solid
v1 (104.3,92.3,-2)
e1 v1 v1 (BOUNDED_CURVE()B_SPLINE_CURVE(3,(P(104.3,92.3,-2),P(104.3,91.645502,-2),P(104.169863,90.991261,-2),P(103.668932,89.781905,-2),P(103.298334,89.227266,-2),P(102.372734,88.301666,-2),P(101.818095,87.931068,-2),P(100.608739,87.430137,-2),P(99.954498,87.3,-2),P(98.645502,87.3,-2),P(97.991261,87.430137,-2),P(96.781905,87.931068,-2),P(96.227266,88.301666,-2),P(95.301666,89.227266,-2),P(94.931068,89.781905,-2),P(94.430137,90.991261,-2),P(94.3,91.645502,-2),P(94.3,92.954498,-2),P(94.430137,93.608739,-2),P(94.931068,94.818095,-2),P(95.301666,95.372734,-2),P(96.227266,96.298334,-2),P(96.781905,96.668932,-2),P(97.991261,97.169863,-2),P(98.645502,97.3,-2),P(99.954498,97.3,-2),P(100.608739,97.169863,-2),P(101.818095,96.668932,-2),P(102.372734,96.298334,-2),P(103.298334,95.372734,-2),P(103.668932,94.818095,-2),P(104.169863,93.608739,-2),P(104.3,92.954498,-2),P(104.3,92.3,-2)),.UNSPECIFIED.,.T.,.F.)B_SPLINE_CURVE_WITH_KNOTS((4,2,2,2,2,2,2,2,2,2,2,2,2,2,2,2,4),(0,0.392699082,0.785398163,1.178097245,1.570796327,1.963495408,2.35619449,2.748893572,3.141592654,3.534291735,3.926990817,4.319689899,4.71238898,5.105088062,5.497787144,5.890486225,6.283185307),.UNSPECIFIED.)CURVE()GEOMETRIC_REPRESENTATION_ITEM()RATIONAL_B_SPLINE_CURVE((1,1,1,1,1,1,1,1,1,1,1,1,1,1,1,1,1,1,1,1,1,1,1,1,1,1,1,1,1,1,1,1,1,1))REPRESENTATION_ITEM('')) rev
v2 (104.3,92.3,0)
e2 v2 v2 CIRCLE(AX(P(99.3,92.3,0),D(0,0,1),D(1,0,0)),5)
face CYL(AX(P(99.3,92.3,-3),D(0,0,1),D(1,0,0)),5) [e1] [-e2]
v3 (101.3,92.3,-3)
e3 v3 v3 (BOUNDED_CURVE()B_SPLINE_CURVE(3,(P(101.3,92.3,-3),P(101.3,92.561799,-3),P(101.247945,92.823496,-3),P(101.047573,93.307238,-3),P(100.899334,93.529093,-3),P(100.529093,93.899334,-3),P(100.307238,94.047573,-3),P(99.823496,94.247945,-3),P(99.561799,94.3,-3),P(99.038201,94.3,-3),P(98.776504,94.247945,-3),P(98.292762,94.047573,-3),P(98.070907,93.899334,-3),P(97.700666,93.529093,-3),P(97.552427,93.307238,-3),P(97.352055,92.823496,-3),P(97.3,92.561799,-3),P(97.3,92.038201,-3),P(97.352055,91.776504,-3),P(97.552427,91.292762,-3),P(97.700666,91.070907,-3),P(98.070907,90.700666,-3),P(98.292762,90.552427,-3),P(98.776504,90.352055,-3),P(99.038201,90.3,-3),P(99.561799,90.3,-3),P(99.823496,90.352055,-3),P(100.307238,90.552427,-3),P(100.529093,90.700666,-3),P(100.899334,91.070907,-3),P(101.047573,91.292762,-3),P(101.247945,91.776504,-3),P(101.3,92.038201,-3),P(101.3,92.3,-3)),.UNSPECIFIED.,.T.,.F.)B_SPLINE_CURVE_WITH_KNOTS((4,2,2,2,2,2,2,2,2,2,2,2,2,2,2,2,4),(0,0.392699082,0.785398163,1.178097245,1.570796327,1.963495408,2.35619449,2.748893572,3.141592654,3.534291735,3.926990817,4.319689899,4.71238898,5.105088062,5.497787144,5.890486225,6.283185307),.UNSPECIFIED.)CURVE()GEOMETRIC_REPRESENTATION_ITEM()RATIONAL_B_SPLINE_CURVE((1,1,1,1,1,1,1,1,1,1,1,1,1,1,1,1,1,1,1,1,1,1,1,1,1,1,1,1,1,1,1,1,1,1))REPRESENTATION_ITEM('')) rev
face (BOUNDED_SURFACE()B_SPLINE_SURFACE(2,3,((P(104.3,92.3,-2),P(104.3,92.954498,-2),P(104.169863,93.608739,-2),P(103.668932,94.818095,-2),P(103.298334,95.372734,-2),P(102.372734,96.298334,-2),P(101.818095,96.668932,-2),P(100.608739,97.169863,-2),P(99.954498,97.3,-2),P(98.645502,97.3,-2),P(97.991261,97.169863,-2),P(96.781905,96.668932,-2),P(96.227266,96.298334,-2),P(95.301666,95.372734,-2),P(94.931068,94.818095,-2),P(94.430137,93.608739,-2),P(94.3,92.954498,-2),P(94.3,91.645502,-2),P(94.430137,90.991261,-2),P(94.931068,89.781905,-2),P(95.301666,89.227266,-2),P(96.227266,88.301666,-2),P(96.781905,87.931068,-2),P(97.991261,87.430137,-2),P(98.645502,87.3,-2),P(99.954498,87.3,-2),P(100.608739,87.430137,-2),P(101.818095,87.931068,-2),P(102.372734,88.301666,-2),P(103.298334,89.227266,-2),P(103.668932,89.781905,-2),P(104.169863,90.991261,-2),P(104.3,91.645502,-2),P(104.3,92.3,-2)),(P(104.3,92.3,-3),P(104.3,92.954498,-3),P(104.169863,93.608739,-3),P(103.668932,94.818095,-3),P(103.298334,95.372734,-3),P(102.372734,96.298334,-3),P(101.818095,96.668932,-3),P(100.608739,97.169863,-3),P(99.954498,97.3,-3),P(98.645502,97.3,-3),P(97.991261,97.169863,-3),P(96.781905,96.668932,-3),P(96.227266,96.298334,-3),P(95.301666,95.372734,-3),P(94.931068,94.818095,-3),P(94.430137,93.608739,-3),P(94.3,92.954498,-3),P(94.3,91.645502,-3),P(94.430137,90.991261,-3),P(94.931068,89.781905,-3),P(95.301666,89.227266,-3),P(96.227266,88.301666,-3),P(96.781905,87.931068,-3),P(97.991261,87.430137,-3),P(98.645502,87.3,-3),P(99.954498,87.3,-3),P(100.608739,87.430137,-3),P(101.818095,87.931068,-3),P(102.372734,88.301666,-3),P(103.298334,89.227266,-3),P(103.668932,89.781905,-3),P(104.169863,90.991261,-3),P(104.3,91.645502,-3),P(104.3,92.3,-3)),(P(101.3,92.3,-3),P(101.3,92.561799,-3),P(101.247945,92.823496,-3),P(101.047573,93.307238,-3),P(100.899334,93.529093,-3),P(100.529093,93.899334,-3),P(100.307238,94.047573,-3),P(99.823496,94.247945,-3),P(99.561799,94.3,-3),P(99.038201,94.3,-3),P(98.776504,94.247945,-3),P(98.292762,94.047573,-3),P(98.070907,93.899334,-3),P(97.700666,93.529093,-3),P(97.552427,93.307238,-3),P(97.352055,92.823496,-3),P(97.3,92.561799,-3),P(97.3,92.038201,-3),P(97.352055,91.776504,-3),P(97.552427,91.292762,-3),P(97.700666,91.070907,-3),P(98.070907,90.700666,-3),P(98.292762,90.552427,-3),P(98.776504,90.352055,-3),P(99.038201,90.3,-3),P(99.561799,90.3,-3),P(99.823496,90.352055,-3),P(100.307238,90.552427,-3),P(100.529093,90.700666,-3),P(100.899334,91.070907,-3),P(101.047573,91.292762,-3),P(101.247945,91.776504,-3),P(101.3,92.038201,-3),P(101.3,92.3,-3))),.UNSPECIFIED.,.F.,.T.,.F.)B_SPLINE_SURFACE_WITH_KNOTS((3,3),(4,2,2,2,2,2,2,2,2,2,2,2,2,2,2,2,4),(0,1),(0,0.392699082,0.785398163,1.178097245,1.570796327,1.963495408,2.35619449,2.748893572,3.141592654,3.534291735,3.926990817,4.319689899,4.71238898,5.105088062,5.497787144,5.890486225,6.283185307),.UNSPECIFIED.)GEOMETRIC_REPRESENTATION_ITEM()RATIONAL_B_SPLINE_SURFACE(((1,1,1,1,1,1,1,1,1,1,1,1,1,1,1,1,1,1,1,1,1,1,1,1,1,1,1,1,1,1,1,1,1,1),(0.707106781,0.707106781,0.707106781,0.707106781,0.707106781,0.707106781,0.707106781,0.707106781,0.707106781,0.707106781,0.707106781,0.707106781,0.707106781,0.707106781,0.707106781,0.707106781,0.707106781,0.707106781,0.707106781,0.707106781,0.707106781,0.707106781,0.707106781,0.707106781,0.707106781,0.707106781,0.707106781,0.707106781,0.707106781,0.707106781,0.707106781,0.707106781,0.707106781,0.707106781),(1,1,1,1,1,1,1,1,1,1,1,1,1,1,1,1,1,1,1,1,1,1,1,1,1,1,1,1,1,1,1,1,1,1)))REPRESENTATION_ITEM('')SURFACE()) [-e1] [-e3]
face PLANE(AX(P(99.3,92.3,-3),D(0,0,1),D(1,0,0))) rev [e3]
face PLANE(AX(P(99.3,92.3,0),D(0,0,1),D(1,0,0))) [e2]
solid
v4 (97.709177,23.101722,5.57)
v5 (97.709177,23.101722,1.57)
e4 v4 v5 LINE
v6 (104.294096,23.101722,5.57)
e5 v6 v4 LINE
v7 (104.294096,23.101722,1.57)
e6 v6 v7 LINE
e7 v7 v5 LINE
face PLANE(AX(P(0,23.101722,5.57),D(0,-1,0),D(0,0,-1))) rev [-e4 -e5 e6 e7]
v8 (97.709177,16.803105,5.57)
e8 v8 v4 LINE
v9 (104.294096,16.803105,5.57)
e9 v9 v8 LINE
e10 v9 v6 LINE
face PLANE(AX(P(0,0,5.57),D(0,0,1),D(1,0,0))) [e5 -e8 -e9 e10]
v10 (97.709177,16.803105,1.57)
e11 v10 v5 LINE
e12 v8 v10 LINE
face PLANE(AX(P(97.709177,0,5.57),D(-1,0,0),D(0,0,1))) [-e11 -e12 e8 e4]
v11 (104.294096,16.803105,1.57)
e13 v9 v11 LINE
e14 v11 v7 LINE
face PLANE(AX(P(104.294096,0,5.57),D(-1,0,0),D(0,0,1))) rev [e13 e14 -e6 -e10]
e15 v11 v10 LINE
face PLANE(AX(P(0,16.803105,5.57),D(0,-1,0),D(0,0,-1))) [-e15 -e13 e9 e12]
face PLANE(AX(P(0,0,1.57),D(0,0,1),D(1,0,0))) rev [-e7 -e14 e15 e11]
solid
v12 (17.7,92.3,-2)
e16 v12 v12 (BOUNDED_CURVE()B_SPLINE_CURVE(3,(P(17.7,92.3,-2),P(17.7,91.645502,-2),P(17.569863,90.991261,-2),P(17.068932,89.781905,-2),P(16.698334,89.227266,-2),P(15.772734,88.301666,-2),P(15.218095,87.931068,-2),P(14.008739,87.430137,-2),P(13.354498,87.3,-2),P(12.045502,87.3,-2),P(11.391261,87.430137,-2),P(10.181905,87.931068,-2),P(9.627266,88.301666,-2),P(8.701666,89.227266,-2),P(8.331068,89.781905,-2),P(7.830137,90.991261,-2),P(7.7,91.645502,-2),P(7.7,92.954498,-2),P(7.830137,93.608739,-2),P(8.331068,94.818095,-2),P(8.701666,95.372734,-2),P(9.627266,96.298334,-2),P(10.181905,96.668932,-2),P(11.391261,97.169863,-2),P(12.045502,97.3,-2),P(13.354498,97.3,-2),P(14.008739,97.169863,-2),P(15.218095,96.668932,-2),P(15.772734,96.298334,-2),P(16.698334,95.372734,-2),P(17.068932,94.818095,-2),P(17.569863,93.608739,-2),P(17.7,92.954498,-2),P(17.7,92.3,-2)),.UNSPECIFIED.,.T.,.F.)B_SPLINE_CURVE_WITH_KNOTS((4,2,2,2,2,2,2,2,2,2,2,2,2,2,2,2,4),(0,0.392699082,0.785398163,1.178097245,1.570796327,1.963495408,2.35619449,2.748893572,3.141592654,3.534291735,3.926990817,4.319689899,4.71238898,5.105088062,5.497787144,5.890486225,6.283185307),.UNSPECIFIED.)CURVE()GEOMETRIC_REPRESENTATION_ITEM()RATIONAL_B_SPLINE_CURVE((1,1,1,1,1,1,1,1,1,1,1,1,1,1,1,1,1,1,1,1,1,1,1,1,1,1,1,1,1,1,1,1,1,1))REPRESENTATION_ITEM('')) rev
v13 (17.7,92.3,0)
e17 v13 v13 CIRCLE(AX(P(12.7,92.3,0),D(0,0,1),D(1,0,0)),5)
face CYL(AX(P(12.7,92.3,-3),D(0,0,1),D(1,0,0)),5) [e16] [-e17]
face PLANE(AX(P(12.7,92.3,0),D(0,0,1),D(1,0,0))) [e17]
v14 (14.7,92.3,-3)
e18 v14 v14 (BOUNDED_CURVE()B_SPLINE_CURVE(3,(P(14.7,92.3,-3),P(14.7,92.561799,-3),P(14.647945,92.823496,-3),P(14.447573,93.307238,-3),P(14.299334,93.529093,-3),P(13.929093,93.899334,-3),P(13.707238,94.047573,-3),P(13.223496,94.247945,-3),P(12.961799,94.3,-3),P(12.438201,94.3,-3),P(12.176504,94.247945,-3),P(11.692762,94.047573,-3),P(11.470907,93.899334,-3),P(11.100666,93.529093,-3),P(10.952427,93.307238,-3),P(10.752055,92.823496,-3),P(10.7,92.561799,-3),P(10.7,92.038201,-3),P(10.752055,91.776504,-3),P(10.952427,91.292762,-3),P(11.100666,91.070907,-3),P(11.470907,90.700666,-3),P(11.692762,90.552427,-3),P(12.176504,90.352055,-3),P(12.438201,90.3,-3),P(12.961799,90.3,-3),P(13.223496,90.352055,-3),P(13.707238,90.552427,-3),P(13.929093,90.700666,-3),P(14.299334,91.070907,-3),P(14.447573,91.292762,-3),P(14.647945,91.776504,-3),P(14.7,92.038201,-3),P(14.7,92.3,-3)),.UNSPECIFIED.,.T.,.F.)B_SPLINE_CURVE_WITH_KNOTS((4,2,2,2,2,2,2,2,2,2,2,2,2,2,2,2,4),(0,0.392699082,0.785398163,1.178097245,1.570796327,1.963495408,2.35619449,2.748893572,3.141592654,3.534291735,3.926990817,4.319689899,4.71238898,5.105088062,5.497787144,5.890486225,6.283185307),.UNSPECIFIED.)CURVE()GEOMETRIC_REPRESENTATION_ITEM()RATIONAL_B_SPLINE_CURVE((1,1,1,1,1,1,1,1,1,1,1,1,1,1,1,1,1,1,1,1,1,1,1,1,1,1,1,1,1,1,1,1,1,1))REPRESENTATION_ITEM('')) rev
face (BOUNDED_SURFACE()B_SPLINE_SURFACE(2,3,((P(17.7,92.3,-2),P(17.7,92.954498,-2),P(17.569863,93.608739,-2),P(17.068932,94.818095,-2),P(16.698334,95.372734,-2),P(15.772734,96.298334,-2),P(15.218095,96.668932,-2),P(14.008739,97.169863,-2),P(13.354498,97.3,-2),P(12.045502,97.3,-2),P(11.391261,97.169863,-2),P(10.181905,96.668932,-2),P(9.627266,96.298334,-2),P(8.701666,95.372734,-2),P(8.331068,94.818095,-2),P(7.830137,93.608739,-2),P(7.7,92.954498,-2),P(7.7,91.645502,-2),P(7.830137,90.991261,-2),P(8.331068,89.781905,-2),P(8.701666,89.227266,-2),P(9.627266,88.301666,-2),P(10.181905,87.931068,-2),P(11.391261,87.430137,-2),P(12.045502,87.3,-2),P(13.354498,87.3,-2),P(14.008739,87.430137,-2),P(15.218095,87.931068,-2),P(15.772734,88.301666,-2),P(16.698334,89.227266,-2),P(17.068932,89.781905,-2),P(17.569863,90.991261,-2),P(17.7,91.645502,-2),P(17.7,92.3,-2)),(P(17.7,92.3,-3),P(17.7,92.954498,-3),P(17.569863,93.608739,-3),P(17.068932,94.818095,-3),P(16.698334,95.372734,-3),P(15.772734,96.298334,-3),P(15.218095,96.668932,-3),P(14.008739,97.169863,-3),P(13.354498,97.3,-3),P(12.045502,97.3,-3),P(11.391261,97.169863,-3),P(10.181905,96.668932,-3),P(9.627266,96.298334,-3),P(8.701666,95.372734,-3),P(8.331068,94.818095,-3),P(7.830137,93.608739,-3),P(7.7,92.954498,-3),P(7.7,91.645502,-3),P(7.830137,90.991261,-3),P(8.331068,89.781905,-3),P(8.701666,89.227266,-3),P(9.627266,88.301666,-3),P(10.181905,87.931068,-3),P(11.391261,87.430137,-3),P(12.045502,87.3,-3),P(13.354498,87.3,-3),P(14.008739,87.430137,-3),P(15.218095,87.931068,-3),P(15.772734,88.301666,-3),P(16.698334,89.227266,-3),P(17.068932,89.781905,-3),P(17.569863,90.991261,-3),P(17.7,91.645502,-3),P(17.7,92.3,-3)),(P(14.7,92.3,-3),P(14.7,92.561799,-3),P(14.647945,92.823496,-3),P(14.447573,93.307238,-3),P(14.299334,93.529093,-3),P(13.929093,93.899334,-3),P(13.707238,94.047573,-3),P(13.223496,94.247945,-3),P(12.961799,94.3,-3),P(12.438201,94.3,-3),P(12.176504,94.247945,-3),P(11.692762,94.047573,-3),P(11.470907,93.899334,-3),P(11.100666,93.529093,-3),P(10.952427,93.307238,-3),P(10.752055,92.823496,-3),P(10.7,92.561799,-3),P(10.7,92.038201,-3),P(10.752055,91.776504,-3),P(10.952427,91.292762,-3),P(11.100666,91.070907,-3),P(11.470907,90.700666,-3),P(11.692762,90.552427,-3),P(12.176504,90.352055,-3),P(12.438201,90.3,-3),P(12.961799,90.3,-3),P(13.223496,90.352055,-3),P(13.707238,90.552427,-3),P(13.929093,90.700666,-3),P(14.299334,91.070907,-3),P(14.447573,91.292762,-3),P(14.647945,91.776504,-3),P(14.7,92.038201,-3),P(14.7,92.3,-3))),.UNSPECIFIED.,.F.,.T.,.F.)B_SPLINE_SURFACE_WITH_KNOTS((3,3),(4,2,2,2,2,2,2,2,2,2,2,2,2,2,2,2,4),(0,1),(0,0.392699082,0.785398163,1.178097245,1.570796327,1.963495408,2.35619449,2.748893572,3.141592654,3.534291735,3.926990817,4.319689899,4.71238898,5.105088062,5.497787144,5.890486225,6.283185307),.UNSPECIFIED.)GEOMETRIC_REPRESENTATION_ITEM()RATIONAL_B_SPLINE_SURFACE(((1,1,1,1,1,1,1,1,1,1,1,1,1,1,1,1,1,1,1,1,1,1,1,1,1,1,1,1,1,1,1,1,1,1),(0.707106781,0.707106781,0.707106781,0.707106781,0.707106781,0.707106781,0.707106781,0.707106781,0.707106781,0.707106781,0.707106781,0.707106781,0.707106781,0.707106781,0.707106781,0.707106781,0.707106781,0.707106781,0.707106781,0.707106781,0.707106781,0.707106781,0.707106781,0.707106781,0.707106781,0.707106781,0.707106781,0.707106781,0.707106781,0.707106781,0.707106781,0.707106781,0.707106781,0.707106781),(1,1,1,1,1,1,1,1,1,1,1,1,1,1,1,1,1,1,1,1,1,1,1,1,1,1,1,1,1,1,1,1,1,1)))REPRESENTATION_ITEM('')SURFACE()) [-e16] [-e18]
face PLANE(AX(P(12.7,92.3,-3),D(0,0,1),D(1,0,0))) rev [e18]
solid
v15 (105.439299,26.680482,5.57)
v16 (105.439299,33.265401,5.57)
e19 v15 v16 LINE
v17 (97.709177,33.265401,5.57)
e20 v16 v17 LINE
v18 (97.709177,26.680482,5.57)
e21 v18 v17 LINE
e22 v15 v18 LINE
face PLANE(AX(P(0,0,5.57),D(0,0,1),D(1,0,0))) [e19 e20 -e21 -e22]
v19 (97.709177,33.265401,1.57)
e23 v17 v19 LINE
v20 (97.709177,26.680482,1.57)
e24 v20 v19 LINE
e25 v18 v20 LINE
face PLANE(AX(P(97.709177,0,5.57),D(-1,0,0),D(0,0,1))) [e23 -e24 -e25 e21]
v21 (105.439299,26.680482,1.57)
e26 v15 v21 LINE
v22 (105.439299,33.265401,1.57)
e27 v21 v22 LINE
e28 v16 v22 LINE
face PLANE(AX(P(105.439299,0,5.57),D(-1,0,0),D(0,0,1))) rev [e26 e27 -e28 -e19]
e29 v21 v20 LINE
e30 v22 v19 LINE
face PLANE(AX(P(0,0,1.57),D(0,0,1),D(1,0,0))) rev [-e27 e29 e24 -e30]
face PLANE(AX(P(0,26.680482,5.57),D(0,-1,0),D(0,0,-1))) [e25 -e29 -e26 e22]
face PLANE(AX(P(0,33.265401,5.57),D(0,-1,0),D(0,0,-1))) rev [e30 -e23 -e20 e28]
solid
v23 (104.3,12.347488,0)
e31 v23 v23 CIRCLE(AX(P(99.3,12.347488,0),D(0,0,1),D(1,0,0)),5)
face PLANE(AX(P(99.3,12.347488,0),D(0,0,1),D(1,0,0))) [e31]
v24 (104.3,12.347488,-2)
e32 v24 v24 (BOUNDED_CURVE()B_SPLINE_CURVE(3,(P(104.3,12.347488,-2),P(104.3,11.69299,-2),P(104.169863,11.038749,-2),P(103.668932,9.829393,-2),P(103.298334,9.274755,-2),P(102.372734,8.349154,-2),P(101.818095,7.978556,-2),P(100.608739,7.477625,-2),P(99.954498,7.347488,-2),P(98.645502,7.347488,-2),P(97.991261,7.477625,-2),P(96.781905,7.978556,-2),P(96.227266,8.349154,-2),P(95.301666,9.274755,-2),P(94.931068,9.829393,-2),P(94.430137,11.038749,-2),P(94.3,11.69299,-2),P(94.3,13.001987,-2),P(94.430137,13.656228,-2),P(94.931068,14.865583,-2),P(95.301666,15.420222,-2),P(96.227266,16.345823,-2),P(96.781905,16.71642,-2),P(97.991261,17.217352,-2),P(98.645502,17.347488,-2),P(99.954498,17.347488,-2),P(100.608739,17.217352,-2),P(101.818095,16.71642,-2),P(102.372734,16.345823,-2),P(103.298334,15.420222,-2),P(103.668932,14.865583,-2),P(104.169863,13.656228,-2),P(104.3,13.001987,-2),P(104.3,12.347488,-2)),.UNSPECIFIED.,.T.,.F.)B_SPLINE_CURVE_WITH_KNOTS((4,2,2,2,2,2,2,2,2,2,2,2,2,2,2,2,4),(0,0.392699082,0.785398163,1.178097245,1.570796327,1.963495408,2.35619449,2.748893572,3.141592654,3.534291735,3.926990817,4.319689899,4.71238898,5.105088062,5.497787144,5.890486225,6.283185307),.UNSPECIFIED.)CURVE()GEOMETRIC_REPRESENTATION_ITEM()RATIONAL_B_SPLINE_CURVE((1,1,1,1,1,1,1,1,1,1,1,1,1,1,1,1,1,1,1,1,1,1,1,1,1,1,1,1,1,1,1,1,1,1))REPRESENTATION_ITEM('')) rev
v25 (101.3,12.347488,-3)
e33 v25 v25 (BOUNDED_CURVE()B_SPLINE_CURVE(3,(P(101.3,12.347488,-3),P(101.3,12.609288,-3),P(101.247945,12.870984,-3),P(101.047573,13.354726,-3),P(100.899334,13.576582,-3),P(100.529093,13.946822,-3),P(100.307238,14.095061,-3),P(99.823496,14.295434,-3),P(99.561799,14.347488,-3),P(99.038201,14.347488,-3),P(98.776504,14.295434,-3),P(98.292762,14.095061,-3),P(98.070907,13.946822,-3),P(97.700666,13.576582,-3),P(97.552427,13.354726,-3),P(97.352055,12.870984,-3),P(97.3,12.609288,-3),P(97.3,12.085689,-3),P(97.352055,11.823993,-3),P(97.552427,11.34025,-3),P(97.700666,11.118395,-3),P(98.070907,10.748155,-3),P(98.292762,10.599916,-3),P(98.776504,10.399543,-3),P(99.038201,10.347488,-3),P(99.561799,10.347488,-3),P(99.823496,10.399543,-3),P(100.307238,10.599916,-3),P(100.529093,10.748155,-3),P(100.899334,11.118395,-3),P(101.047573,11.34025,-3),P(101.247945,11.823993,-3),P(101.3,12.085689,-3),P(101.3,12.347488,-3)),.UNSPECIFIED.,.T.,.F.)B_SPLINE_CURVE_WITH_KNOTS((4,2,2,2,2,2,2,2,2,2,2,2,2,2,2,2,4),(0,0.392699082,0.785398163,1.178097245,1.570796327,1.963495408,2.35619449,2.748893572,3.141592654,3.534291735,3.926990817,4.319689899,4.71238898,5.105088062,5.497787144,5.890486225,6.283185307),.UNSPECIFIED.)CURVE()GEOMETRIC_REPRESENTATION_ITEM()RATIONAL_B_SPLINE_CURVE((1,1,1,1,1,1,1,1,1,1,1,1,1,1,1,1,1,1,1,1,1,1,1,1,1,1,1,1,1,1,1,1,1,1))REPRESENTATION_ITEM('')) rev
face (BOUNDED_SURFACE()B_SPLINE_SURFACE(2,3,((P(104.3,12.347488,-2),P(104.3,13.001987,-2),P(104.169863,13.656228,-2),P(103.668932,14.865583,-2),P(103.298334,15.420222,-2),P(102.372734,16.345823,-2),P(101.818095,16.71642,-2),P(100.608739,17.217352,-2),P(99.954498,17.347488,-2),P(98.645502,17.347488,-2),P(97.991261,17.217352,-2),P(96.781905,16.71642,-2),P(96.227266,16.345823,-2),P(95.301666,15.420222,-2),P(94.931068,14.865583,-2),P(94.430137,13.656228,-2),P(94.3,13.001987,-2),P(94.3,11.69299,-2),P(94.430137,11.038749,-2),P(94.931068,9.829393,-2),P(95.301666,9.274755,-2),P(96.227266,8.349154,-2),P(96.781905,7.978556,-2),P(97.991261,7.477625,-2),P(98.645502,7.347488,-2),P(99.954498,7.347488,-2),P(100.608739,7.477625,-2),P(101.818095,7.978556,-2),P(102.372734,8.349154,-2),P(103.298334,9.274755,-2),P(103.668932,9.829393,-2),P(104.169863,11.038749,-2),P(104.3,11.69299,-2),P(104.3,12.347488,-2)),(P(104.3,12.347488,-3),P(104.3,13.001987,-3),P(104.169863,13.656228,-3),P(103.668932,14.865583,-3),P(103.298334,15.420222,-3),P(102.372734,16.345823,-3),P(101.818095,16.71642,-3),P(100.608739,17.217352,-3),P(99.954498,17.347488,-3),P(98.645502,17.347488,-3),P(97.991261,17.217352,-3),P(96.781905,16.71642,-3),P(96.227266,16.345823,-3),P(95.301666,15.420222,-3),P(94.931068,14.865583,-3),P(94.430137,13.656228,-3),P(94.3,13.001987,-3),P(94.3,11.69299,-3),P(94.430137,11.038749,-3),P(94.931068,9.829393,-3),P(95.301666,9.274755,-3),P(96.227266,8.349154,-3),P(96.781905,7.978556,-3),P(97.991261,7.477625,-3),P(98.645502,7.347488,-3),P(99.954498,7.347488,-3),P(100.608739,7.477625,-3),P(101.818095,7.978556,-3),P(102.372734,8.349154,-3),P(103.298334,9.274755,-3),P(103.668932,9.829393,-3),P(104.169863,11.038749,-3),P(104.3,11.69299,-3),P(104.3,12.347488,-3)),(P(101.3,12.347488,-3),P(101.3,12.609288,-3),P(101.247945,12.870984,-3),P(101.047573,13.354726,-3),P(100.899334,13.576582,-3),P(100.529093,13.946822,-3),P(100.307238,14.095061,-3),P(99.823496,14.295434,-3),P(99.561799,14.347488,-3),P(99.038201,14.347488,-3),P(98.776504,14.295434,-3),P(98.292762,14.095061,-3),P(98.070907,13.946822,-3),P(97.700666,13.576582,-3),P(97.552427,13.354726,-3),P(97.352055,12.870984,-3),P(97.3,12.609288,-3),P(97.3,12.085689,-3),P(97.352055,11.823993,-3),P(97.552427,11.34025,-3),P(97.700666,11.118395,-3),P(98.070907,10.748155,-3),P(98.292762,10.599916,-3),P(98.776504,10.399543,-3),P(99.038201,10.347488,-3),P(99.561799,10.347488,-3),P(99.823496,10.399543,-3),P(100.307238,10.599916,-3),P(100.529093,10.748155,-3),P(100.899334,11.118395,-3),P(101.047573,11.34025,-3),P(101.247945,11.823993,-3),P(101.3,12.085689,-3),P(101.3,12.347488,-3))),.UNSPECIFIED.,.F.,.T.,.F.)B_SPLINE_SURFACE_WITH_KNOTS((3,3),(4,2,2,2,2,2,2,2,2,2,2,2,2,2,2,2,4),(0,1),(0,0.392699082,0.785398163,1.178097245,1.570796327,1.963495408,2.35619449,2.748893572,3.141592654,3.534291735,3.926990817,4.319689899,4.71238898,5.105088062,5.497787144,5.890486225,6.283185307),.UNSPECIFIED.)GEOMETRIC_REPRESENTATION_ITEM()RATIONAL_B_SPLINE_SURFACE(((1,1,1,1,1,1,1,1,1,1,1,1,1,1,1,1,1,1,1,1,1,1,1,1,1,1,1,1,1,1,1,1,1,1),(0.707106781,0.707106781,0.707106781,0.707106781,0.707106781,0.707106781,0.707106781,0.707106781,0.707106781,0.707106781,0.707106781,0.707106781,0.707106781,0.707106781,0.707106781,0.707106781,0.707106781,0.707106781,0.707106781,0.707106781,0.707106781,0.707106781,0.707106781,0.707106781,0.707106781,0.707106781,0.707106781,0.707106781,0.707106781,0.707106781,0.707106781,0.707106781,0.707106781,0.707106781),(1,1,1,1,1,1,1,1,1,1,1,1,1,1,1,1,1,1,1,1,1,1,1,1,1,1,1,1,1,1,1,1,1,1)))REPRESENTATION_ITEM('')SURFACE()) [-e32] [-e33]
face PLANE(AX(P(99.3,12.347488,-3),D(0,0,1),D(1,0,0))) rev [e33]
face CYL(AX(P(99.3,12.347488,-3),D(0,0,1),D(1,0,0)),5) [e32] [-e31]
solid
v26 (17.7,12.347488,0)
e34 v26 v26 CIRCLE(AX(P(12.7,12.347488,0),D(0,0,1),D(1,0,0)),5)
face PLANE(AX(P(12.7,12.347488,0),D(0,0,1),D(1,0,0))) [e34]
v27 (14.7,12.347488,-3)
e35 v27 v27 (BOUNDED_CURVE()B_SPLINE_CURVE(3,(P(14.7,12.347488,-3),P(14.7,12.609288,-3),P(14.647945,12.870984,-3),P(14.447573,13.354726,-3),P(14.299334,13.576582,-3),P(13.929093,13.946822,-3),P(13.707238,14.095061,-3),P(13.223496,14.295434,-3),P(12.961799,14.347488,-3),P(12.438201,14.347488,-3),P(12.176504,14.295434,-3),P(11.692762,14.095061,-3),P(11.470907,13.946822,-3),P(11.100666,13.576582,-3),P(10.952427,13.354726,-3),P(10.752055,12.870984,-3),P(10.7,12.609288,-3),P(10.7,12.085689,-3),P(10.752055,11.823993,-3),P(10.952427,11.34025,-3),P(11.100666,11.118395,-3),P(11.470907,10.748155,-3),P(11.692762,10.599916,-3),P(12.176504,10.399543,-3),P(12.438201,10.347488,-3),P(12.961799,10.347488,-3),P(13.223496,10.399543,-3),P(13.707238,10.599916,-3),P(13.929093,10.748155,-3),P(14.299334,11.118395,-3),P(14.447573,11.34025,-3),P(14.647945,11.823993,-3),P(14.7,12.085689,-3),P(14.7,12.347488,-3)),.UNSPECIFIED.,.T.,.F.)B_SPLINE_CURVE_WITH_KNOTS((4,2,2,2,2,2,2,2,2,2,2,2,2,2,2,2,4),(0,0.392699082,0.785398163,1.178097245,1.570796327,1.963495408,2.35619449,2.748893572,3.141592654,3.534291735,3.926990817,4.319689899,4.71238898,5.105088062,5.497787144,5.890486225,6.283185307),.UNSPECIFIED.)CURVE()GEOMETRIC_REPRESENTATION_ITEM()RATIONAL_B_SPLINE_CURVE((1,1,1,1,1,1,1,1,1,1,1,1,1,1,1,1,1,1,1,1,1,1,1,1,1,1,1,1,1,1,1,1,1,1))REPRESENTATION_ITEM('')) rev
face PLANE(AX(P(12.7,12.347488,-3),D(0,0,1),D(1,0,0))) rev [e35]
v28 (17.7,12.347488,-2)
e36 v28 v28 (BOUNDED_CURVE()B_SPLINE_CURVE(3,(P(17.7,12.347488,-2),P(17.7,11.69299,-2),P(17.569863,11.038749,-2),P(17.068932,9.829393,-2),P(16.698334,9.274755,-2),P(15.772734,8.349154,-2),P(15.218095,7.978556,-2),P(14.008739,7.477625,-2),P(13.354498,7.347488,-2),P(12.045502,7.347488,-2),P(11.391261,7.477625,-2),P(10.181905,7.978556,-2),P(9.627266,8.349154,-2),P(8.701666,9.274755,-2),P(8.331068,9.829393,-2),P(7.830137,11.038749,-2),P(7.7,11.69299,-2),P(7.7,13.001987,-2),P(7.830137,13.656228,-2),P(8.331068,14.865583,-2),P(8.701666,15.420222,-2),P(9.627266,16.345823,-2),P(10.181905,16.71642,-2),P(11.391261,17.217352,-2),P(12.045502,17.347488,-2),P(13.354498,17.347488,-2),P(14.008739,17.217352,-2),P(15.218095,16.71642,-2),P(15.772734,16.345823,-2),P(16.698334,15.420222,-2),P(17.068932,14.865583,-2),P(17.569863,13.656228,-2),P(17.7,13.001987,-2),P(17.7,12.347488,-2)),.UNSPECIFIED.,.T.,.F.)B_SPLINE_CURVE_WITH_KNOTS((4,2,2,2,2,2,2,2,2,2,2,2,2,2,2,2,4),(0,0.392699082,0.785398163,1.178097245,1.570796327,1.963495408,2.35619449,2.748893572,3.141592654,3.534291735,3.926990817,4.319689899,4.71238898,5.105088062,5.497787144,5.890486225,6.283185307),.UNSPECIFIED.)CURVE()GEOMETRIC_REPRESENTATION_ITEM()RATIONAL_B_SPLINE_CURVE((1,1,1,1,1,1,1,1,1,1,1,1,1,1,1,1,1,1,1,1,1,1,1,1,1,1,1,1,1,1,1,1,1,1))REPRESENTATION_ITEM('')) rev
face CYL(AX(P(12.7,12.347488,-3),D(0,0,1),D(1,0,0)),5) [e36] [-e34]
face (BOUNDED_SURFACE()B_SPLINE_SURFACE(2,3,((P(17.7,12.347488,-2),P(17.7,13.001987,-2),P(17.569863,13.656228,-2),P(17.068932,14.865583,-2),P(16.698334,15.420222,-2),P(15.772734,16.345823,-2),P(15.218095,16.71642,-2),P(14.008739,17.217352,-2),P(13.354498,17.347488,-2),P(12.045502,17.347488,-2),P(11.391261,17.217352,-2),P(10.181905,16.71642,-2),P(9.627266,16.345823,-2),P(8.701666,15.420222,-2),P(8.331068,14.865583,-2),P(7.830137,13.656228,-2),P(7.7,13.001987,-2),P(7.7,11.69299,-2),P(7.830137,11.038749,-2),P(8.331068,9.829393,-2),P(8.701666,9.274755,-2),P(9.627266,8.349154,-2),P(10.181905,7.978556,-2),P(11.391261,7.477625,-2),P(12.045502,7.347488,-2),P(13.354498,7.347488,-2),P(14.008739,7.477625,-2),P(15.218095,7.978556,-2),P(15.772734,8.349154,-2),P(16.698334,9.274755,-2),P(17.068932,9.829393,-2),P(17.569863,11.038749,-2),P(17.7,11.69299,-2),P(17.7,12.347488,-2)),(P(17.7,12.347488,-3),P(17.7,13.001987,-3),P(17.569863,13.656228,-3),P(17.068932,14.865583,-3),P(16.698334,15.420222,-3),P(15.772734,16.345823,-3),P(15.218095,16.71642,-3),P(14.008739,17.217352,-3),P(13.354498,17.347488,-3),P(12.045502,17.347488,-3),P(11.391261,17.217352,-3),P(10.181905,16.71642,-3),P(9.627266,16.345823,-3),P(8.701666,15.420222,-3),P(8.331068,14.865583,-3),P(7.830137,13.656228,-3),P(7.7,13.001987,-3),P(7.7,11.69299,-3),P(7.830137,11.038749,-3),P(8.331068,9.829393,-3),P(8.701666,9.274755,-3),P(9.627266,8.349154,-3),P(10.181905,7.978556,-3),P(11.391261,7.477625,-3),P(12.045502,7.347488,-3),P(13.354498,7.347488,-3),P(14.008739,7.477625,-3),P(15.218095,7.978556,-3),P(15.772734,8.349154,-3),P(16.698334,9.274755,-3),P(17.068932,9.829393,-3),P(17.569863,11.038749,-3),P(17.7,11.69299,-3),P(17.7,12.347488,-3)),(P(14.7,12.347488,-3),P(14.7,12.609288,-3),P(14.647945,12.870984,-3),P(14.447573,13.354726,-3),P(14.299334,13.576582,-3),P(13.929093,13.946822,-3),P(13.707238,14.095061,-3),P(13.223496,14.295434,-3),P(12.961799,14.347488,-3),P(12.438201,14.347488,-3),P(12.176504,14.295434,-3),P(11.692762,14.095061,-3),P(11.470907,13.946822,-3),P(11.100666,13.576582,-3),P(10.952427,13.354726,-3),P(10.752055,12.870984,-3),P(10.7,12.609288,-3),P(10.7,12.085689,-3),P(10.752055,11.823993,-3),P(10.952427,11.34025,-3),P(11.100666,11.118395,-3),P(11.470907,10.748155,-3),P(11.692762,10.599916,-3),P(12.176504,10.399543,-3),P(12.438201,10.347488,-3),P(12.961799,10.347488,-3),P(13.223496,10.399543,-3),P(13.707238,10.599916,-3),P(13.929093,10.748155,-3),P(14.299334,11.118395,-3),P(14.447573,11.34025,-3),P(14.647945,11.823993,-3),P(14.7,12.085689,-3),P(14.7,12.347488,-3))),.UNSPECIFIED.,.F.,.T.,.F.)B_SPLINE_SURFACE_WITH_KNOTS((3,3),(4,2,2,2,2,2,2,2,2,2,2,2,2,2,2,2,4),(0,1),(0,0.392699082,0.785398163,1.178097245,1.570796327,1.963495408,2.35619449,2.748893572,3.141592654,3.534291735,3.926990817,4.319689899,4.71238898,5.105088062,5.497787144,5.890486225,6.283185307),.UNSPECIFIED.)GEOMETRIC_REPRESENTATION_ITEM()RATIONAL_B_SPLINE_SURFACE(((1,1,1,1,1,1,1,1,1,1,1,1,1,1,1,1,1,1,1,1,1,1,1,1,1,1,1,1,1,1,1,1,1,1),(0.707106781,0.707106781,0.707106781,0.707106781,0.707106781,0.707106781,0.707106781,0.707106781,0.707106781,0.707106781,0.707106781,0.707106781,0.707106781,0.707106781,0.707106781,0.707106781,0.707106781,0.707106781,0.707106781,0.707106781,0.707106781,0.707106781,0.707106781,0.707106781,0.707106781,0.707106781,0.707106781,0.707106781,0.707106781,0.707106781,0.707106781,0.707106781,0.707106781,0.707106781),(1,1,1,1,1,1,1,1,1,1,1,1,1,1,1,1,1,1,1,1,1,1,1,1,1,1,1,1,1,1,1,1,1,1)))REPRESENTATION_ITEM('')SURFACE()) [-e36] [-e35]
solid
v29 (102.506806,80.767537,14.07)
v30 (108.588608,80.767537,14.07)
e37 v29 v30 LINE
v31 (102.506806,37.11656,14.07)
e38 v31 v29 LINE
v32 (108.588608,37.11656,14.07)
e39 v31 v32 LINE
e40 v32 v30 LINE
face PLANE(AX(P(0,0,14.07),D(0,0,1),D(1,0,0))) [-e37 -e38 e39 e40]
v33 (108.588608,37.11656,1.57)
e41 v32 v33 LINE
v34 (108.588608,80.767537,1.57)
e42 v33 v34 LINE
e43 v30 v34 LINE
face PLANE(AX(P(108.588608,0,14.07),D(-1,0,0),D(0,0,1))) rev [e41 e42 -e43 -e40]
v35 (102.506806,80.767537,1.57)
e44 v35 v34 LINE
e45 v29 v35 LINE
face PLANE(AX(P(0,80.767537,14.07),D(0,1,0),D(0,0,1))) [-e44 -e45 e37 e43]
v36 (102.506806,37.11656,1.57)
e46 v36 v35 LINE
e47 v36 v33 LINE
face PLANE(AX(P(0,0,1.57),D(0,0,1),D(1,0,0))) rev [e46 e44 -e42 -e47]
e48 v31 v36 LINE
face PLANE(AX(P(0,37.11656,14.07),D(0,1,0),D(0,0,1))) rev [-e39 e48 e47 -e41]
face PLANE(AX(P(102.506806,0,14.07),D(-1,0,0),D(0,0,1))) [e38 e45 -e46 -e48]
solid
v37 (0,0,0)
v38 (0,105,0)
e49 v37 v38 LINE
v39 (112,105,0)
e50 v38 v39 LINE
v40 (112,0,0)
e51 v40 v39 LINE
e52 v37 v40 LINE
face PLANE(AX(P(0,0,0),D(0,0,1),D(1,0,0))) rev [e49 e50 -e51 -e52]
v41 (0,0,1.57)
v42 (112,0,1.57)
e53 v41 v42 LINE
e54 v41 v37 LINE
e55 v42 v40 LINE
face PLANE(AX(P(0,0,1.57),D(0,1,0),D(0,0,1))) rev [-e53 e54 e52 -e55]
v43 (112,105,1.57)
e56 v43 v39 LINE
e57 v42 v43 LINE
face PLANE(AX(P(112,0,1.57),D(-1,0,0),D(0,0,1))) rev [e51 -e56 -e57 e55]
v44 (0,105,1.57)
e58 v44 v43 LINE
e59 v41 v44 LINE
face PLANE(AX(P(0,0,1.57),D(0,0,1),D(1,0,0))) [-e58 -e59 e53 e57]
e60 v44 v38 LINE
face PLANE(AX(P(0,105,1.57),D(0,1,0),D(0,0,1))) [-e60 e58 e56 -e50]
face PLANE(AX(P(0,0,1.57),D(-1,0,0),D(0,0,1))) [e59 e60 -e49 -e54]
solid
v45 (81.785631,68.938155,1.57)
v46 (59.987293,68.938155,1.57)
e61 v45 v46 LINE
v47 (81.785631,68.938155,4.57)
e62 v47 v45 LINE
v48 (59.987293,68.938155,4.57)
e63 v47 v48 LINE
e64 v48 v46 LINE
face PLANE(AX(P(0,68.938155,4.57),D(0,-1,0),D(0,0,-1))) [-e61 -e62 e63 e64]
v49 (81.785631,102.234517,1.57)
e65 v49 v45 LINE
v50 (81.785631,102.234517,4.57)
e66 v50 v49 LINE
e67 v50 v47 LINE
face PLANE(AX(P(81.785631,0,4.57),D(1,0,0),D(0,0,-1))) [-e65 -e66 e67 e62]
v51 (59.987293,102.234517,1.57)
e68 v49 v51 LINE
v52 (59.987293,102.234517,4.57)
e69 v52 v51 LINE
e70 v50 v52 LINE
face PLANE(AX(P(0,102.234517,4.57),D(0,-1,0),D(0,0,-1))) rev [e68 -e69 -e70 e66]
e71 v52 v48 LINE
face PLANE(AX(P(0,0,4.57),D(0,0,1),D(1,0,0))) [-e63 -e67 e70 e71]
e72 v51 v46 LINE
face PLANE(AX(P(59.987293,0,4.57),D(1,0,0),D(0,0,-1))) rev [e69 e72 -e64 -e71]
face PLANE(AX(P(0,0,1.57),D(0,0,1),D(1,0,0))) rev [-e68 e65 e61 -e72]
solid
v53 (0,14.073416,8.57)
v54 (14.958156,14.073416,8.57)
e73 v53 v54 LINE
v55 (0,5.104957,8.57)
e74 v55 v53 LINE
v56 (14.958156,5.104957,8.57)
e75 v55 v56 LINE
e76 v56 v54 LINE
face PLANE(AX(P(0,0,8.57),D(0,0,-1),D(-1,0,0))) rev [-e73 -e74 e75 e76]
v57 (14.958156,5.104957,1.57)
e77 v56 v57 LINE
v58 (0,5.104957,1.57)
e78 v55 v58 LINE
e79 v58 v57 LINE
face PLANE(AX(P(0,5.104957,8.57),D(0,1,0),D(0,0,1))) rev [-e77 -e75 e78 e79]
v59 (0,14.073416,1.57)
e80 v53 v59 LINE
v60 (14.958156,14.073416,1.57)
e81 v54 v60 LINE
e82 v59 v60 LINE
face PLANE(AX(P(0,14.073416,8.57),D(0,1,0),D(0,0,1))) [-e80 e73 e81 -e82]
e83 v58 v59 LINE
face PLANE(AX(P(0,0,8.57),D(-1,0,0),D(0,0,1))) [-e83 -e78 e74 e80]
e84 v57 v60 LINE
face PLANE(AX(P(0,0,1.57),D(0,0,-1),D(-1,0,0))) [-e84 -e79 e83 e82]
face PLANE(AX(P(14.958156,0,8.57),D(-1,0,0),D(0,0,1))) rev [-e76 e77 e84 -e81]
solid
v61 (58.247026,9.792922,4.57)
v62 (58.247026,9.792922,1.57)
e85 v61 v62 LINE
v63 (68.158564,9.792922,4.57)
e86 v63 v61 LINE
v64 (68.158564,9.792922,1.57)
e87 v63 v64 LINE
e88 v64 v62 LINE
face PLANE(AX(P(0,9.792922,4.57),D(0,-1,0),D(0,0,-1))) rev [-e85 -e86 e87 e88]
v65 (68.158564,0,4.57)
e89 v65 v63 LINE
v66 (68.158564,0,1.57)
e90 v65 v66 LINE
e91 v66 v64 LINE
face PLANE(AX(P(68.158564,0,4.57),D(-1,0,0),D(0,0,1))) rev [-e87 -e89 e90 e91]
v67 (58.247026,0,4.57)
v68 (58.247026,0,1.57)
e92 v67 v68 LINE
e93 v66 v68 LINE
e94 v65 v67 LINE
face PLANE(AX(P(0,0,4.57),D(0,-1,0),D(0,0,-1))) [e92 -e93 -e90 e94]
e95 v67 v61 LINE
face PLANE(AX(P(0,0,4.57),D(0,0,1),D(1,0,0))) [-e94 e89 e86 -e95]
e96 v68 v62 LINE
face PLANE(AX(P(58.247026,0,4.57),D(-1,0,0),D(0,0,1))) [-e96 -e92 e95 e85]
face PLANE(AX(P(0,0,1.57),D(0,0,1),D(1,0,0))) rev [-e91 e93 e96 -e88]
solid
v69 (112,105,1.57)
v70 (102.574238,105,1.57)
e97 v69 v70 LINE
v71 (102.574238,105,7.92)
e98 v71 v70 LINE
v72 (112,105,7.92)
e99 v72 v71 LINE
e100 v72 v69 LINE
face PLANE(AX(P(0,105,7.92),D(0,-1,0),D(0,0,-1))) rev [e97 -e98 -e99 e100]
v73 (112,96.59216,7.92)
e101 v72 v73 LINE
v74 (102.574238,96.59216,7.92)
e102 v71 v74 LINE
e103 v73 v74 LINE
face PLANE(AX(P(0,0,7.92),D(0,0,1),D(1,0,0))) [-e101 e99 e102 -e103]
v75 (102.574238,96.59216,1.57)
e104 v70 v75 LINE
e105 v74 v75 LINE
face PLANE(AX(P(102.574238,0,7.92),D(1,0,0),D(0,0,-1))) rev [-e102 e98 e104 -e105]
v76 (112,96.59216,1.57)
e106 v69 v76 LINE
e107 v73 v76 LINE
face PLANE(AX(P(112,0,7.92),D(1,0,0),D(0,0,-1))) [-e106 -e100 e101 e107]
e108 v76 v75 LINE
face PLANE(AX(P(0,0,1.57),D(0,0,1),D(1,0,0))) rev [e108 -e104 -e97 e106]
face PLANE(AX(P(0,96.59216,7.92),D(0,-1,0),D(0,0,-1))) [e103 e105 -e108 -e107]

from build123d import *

# Parameters (mm, degrees)
SKETCH1_W             = 112
SKETCH1_H             = 105
BASE_PCB_DEPTH        = 1.57
SMA_START             = 1.57
SKETCH1_3_W           = 9.425761926
SKETCH1_3_H           = 8.407839617
SMA_CONNECTOR_DEPTH   = 6.35
MINI_START            = 1.57
SKETCH1_4_W           = 9.91153772
SKETCH1_4_H           = 9.792921807
MINI_USB_DEPTH        = 3
BARREL_START          = 1.57
SKETCH1_5_W           = 14.958155809
SKETCH1_5_H           = 8.968458872
BARREL_JACK_DEPTH     = 7
GPIO_START            = 1.57
SKETCH1_6_W           = 6.081801239
SKETCH1_6_H           = 43.650976509
GPIO_DEPTH            = 12.5
BUTTONS_START         = 1.57
SKETCH1_7_W           = 7.730121667
SKETCH1_7_H           = 6.584918457
BUTTONS_DEPTH         = 4
SKETCH1_7_W_2         = 6.584918457
SKETCH1_7_H_2         = 6.298617654
BUTTONS_2_DEPTH       = 4
XBEE_START            = 1.57
SKETCH1_8_W           = 21.798337537
SKETCH1_8_H           = 33.296361733
XBEE_DEPTH            = 3
SKETCH2_R             = 5
BOSS_EXTRUDE8_DEPTH   = 3
BOSS_EXTRUDE8_2_DEPTH = 3
BOSS_EXTRUDE8_3_DEPTH = 3
BOSS_EXTRUDE8_4_DEPTH = 3
FILLET1_SIZE          = 1
FILLET1_SIZE_2        = 3
FILLET2_SIZE          = 1
FILLET2_SIZE_2        = 3
FILLET3_SIZE          = 1
FILLET3_SIZE_2        = 3
FILLET4_SIZE          = 1
FILLET4_SIZE_2        = 3


with BuildPart() as part:
    # Sketch1 → Base PCB (new body)
    with BuildSketch(Plane.XY):
        with Locations((56, 52.5)):
            Rectangle(SKETCH1_W, SKETCH1_H)
    extrude(amount=BASE_PCB_DEPTH)


with BuildPart() as body_2:
    # Sketch1<3> → SMA Connector (new body)
    with BuildSketch(Plane.XY.offset(SMA_START)):
        with Locations((107.287119037, 100.796080192)):
            Rectangle(SKETCH1_3_W, SKETCH1_3_H)
    extrude(amount=SMA_CONNECTOR_DEPTH)


with BuildPart() as body_3:
    # Sketch1<4> → Mini USB (new body)
    with BuildSketch(Plane.XY.offset(MINI_START)):
        with Locations((63.202795022, 4.896460904)):
            Rectangle(SKETCH1_4_W, SKETCH1_4_H)
    extrude(amount=MINI_USB_DEPTH)


with BuildPart() as body_4:
    # Sketch1<5> → Barrel Jack (new body)
    with BuildSketch(Plane.XY.offset(BARREL_START)):
        with Locations((7.479077905, 9.58918666)):
            Rectangle(SKETCH1_5_W, SKETCH1_5_H)
    extrude(amount=BARREL_JACK_DEPTH)


with BuildPart() as body_5:
    # Sketch1<6> → GPIO (new body)
    with BuildSketch(Plane.XY.offset(GPIO_START)):
        with Locations((105.547707115, 58.942048646)):
            Rectangle(SKETCH1_6_W, SKETCH1_6_H)
    extrude(amount=GPIO_DEPTH)


with BuildPart() as body_6:
    # Sketch1<7> → Buttons (new body)
    with BuildSketch(Plane.XY.offset(BUTTONS_START)):
        with Locations((101.574238073, 29.972941445)):
            Rectangle(SKETCH1_7_W, SKETCH1_7_H)
    extrude(amount=BUTTONS_DEPTH)


with BuildPart() as body_7:
    # Sketch1<7> → Buttons 2 (new body)
    with BuildSketch(Plane.XY.offset(BUTTONS_START)):
        with Locations((101.001636469, 19.952413358)):
            Rectangle(SKETCH1_7_W_2, SKETCH1_7_H_2)
    extrude(amount=BUTTONS_2_DEPTH)


with BuildPart() as body_8:
    # Sketch1<8> → Xbee (new body)
    with BuildSketch(Plane.XY.offset(XBEE_START)):
        with Locations((70.886461835, 85.586335751)):
            Rectangle(SKETCH1_8_W, SKETCH1_8_H)
    extrude(amount=XBEE_DEPTH)


with BuildPart() as body_9:
    # Sketch2 → Boss-Extrude8 (new body)
    with BuildSketch(Plane(origin=(0, 0, 0), x_dir=(-1, 0, 0), z_dir=(0, 0, -1))):
        with Locations(Location((-99.3, 92.3, 0), (0, 0, 180))):
            Circle(SKETCH2_R)
    extrude(amount=BOSS_EXTRUDE8_DEPTH)

    # Fillet1
    # an asymmetric fillet: 3, 1 mm, written as the material it takes off along each edge
    with BuildSketch(Plane(origin=(99.3, 92.3, -3), x_dir=(1, 0, 0), z_dir=(0, 1, 0))) as fillet1_piece_1:
        with BuildLine():
            Bezier((5, -FILLET1_SIZE), (5, 0), (5 - FILLET1_SIZE_2, 0), weights=[1, 0.707106781, 1])
            Line((5 - FILLET1_SIZE_2, 0), (5, 0))
            Line((5, 0), (5, -FILLET1_SIZE))
        make_face()
    revolve(axis=Axis((99.3, 92.3, -3), (0, 0, -1)), mode=Mode.SUBTRACT)


with BuildPart() as body_10:
    # Sketch2 → Boss-Extrude8 2 (new body)
    with BuildSketch(Plane(origin=(0, 0, 0), x_dir=(-1, 0, 0), z_dir=(0, 0, -1))):
        with Locations(Location((-12.7, 92.3, 0), (0, 0, 180))):
            Circle(SKETCH2_R)
    extrude(amount=BOSS_EXTRUDE8_2_DEPTH)

    # Fillet3
    # an asymmetric fillet: 3, 1 mm, written as the material it takes off along each edge
    with BuildSketch(Plane(origin=(12.7, 92.3, -3), x_dir=(1, 0, 0), z_dir=(0, 1, 0))) as fillet3_piece_1:
        with BuildLine():
            Bezier((5, -FILLET3_SIZE), (5, 0), (5 - FILLET3_SIZE_2, 0), weights=[1, 0.707106781, 1])
            Line((5 - FILLET3_SIZE_2, 0), (5, 0))
            Line((5, 0), (5, -FILLET3_SIZE))
        make_face()
    revolve(axis=Axis((12.7, 92.3, -3), (0, 0, -1)), mode=Mode.SUBTRACT)


with BuildPart() as body_11:
    # Sketch2 → Boss-Extrude8 3 (new body)
    with BuildSketch(Plane(origin=(0, 0, 0), x_dir=(-1, 0, 0), z_dir=(0, 0, -1))):
        with Locations(Location((-99.3, 12.347488339, 0), (0, 0, 180))):
            Circle(SKETCH2_R)
    extrude(amount=BOSS_EXTRUDE8_3_DEPTH)

    # Fillet2
    # an asymmetric fillet: 3, 1 mm, written as the material it takes off along each edge
    with BuildSketch(Plane(origin=(99.3, 12.347488339, -3), x_dir=(1, 0, 0), z_dir=(0, 1, 0))) as fillet2_piece_1:
        with BuildLine():
            Bezier((5, -FILLET2_SIZE), (5, 0), (5 - FILLET2_SIZE_2, 0), weights=[1, 0.707106781, 1])
            Line((5 - FILLET2_SIZE_2, 0), (5, 0))
            Line((5, 0), (5, -FILLET2_SIZE))
        make_face()
    revolve(axis=Axis((99.3, 12.347488339, -3), (0, 0, -1)), mode=Mode.SUBTRACT)


with BuildPart() as body_12:
    # Sketch2 → Boss-Extrude8 4 (new body)
    with BuildSketch(Plane(origin=(0, 0, 0), x_dir=(-1, 0, 0), z_dir=(0, 0, -1))):
        with Locations(Location((-12.7, 12.347488339, 0), (0, 0, 180))):
            Circle(SKETCH2_R)
    extrude(amount=BOSS_EXTRUDE8_4_DEPTH)

    # Fillet4
    # an asymmetric fillet: 3, 1 mm, written as the material it takes off along each edge
    with BuildSketch(Plane(origin=(12.7, 12.347488339, -3), x_dir=(1, 0, 0), z_dir=(0, 1, 0))) as fillet4_piece_1:
        with BuildLine():
            Bezier((5, -FILLET4_SIZE), (5, 0), (5 - FILLET4_SIZE_2, 0), weights=[1, 0.707106781, 1])
            Line((5 - FILLET4_SIZE_2, 0), (5, 0))
            Line((5, 0), (5, -FILLET4_SIZE))
        make_face()
    revolve(axis=Axis((12.7, 12.347488339, -3), (0, 0, -1)), mode=Mode.SUBTRACT)


solid = Compound([part.part, body_2.part, body_3.part, body_4.part, body_5.part, body_6.part, body_7.part, body_8.part, body_9.part, body_10.part, body_11.part, body_12.part])
